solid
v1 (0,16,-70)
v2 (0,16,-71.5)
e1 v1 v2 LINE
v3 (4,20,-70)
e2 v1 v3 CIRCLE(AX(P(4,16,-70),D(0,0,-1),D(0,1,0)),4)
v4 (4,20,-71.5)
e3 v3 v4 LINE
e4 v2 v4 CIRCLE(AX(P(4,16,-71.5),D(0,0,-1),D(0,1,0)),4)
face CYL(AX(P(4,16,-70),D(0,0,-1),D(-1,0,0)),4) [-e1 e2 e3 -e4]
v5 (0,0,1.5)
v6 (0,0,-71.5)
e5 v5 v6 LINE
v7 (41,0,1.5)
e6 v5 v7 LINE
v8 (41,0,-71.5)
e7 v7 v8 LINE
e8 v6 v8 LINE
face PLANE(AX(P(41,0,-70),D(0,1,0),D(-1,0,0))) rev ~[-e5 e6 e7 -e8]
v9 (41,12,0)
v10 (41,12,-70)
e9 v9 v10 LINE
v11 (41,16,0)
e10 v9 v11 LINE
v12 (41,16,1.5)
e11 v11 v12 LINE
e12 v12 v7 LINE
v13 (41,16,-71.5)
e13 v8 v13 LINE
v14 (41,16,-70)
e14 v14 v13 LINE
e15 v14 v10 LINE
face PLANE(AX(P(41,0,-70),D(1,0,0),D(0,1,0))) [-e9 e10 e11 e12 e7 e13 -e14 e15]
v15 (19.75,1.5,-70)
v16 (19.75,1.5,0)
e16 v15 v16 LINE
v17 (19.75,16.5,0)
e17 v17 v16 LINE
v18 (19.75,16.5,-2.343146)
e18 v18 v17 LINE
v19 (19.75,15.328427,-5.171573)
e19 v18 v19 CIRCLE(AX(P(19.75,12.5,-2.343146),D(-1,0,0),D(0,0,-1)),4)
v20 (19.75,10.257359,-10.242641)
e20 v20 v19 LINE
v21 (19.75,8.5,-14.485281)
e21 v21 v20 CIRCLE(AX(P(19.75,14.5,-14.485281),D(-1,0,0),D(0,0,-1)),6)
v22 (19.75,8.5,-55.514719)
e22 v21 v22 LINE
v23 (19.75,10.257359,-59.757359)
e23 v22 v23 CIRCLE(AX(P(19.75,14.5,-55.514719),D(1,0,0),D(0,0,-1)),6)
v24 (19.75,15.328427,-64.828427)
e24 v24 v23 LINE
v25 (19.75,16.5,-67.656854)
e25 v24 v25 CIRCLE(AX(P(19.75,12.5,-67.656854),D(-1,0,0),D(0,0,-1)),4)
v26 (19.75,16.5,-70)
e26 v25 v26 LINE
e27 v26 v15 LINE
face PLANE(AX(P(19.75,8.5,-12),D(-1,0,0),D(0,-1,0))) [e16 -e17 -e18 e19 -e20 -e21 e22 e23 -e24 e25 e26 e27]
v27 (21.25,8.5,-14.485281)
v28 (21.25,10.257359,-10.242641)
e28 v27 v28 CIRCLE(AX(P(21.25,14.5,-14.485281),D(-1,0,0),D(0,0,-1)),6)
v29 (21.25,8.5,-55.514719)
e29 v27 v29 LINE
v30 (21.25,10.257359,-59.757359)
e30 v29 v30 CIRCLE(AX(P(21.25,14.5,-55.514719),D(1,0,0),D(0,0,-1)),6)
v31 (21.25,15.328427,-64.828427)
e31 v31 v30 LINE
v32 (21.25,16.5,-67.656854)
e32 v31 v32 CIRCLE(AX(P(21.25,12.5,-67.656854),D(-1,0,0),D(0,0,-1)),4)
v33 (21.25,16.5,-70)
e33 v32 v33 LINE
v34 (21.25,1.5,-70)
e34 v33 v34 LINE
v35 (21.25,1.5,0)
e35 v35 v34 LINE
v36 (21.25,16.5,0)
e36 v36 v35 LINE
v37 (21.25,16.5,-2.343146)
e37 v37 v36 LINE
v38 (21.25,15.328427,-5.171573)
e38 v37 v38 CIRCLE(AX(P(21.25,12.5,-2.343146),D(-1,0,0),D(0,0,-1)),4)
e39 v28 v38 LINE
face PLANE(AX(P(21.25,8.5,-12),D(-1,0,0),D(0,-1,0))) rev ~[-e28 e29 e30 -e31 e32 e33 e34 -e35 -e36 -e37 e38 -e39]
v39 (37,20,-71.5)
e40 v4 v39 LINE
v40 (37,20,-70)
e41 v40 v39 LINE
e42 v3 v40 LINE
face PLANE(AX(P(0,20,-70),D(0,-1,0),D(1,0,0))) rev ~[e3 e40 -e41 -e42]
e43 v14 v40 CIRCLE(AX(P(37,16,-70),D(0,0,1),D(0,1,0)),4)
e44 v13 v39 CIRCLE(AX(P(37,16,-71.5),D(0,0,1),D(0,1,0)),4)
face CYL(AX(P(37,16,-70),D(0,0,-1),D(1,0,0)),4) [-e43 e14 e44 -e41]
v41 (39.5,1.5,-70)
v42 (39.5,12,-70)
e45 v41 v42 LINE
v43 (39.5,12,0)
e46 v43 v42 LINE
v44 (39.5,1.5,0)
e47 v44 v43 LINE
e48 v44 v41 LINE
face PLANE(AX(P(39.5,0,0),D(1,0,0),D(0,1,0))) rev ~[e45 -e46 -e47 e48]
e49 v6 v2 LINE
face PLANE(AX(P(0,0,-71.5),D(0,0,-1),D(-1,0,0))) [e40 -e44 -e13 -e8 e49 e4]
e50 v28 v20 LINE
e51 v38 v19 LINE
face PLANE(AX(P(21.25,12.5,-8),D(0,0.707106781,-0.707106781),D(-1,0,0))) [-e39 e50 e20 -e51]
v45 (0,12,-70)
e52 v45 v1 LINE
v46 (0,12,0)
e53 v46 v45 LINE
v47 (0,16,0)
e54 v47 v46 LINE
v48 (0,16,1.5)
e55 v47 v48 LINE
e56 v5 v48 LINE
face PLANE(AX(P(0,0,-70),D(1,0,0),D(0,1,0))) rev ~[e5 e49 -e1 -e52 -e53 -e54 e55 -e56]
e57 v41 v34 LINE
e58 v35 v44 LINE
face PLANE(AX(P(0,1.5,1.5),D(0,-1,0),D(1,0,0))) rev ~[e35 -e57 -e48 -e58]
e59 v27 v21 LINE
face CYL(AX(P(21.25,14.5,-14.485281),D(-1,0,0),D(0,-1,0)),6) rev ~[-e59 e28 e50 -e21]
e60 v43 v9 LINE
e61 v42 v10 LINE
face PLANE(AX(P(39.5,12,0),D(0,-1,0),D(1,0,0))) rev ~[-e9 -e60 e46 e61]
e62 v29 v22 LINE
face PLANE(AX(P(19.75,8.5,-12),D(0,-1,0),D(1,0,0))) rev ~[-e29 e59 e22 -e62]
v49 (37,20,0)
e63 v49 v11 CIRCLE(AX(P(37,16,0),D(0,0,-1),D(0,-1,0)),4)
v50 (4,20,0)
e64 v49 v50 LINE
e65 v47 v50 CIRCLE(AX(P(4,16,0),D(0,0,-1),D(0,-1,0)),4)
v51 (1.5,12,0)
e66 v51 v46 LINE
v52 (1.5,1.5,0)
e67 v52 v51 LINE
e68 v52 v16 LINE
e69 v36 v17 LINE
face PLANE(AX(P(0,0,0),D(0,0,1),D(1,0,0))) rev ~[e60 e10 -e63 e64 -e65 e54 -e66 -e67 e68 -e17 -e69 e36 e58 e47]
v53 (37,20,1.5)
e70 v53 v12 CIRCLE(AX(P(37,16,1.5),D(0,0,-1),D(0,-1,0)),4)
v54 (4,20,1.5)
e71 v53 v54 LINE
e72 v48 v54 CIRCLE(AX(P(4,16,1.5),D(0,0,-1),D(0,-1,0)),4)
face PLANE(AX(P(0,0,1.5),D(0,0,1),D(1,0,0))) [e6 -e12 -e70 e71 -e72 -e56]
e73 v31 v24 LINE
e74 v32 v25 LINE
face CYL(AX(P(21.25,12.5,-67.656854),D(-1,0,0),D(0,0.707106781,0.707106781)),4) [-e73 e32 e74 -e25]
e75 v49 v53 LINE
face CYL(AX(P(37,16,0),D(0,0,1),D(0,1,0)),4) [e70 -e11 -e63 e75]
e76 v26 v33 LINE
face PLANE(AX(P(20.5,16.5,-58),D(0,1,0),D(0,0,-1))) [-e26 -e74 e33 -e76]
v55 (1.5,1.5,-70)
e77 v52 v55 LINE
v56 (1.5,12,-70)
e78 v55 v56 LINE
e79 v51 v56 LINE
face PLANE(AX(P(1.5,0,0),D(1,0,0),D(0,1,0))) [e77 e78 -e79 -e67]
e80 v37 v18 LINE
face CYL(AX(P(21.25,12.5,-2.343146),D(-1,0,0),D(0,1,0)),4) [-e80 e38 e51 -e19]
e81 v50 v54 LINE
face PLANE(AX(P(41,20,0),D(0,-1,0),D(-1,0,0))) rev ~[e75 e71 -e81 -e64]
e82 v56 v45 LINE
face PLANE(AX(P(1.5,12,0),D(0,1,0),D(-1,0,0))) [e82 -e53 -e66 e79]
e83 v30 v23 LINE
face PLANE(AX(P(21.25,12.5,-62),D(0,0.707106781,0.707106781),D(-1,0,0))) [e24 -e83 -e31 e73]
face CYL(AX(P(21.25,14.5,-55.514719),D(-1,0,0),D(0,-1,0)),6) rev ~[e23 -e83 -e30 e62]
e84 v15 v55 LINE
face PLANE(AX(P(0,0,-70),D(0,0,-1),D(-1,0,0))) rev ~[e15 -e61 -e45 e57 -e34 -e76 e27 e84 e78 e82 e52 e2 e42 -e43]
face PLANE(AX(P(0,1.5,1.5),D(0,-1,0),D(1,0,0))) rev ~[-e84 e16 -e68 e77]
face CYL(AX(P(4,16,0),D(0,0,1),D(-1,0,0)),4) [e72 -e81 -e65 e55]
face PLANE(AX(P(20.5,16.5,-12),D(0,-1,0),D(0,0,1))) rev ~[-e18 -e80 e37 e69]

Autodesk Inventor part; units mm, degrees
ref_plane "YZ Plane" through (0, 0, 0) normal (1, 0, 0) x (0, 1, 0)
ref_plane "XZ Plane" through (0, 0, 0) normal (0, 1, 0) x (-1, 0, 0)
sketch "Sketch1" plane through (0, 0, 0) normal (0, 0, 1) x (1, 0, 0)
  line L0 (0, 0) -> (41, 0)
  line L1 (41, 0) -> (41, 20)
  line L2 (41, 20) -> (0, 20)
  line L3 (0, 20) -> (0, 0)
  dimension "d0" = 41
  dimension "d1" = 20
extrude "Extrusion1" add sketch "Sketch1" along normal blind 1.5
fillet "Fillet1" radius 4 2 edges at (41, 20, 0.75) (0, 20, 0.75)
sketch "Sketch3" plane through (0, 0, 0) normal (0, 0, -1) x (-1, 0, 0)
  line L0 (0, 0) -> (-41, 0) projected
  line L1 (-41, 0) -> (-39.5, 0)
  line L2 (-39.5, 0) -> (-39.5, 12)
  line L3 (-39.5, 12) -> (-41, 12)
  line L4 (-41, 12) -> (-41, 0)
  dimension "d5" = 1.5
  dimension "d6" = 12
extrude "Extrusion2" add sketch "Sketch3" along normal blind 70
sketch "Sketch4" plane through (0, 0, 0) normal (0, 0, -1) x (-1, 0, 0)
  line L0 (0, 0) -> (-39.5, 0) projected
  line L1 (0, 0) -> (-1.5, 0)
  line L2 (-1.5, 0) -> (-1.5, 12)
  line L3 (-1.5, 12) -> (0, 12)
  line L4 (0, 12) -> (0, 0)
  dimension "d9" = 1.5
  dimension "d10" = 12
extrude "Extrusion3" add sketch "Sketch4" along normal blind 70
sketch "Sketch5" plane through (0, 0, -70) normal (0, 0, -1) x (-1, 0, 0)
  line L0 (-41, 0) -> (-41, 16) projected
  line L1 (-41, 0) -> (0, 0)
  line L2 (0, 0) -> (0, 20)
  line L3 (0, 20) -> (-41, 20)
  line L4 (-41, 20) -> (-41, 0)
extrude "Extrusion4" add sketch "Sketch5" along normal blind 1.5
fillet "Fillet2" radius 4 2 edges at (0, 20, -70.75) (41, 20, -70.75)
sketch "Sketch6" plane through (0, 0, 1.5) normal (0, -1, 0) x (1, 0, 0)
  line L0 (4, -73) -> (0, -73) projected
  line L1 (41, 0) -> (41, -1.5) projected
  line L2 (0, -73) -> (41, -73)
  line L3 (41, -73) -> (41, 0)
  line L4 (41, 0) -> (0, 0)
  line L5 (0, 0) -> (0, -73)
  point P0 (0, -1.5)
extrude "Extrusion5" add sketch "Sketch6" against normal blind 1.5
ref_plane "Work Plane1" through (20.5, 0, 1.5) normal (1, 0, 0) x (0, 0, -1)
sketch "Sketch9" plane through (20.5, 0, 1.5) normal (1, 0, 0) x (0, 0, -1)
  line L0 (71.5, 1.5) -> (59.5, 1.5)
  line L1 (59.5, 1.5) -> (59.5, 16.5)
  line L2 (59.5, 16.5) -> (71.5, 16.5)
  line L3 (71.5, 16.5) -> (71.5, 1.5)
  point P0 (1.5, 0)
  dimension "d25" = 12
  dimension "d26" = 15
extrude "Extrusion6" add sketch "Sketch9" along normal mid plane 1.5
chamfer "Chamfer1" distance 8 angle 45 1 edges at (20.5, 16.5, -58)
fillet "Fillet3" radius 4 1 edges at (20.5, 16.5, -66)
sketch "Sketch10" plane through (20.5, 0, 1.5) normal (1, 0, 0) x (0, 0, -1)
  line L0 (1.5, 1.5) -> (13.5, 1.5)
  line L1 (13.5, 1.5) -> (13.5, 16.5)
  line L2 (13.5, 16.5) -> (1.5, 16.5)
  line L3 (1.5, 16.5) -> (1.5, 1.5)
  point P0 (1.5, 0)
  dimension "d27" = 12
  dimension "d28" = 15
extrude "Extrusion7" add sketch "Sketch10" along normal mid plane 1.5
chamfer "Chamfer2" distance 8 angle 45 1 edges at (20.5, 16.5, -12)
fillet "Fillet4" radius 4 1 edges at (20.5, 16.5, -4)
sketch "Sketch11" plane through (21.25, 1.5, -12) normal (0, 0, -1) x (-1, 0, 0)
  line L0 (1.5, 7) -> (1.5, 0) projected
  line L1 (0, 0) -> (1.5, 0)
  line L2 (1.5, 0) -> (1.5, 7)
  line L3 (1.5, 7) -> (0, 7)
  line L4 (0, 7) -> (0, 0)
  point P0 (21.25, -1.5)
extrude "Extrusion8" add sketch "Sketch11" along normal blind 50
fillet "Fillet5" radius 6 2 edges at (20.5, 8.5, -58) (20.5, 8.5, -12)
properties part number "porta pila"
